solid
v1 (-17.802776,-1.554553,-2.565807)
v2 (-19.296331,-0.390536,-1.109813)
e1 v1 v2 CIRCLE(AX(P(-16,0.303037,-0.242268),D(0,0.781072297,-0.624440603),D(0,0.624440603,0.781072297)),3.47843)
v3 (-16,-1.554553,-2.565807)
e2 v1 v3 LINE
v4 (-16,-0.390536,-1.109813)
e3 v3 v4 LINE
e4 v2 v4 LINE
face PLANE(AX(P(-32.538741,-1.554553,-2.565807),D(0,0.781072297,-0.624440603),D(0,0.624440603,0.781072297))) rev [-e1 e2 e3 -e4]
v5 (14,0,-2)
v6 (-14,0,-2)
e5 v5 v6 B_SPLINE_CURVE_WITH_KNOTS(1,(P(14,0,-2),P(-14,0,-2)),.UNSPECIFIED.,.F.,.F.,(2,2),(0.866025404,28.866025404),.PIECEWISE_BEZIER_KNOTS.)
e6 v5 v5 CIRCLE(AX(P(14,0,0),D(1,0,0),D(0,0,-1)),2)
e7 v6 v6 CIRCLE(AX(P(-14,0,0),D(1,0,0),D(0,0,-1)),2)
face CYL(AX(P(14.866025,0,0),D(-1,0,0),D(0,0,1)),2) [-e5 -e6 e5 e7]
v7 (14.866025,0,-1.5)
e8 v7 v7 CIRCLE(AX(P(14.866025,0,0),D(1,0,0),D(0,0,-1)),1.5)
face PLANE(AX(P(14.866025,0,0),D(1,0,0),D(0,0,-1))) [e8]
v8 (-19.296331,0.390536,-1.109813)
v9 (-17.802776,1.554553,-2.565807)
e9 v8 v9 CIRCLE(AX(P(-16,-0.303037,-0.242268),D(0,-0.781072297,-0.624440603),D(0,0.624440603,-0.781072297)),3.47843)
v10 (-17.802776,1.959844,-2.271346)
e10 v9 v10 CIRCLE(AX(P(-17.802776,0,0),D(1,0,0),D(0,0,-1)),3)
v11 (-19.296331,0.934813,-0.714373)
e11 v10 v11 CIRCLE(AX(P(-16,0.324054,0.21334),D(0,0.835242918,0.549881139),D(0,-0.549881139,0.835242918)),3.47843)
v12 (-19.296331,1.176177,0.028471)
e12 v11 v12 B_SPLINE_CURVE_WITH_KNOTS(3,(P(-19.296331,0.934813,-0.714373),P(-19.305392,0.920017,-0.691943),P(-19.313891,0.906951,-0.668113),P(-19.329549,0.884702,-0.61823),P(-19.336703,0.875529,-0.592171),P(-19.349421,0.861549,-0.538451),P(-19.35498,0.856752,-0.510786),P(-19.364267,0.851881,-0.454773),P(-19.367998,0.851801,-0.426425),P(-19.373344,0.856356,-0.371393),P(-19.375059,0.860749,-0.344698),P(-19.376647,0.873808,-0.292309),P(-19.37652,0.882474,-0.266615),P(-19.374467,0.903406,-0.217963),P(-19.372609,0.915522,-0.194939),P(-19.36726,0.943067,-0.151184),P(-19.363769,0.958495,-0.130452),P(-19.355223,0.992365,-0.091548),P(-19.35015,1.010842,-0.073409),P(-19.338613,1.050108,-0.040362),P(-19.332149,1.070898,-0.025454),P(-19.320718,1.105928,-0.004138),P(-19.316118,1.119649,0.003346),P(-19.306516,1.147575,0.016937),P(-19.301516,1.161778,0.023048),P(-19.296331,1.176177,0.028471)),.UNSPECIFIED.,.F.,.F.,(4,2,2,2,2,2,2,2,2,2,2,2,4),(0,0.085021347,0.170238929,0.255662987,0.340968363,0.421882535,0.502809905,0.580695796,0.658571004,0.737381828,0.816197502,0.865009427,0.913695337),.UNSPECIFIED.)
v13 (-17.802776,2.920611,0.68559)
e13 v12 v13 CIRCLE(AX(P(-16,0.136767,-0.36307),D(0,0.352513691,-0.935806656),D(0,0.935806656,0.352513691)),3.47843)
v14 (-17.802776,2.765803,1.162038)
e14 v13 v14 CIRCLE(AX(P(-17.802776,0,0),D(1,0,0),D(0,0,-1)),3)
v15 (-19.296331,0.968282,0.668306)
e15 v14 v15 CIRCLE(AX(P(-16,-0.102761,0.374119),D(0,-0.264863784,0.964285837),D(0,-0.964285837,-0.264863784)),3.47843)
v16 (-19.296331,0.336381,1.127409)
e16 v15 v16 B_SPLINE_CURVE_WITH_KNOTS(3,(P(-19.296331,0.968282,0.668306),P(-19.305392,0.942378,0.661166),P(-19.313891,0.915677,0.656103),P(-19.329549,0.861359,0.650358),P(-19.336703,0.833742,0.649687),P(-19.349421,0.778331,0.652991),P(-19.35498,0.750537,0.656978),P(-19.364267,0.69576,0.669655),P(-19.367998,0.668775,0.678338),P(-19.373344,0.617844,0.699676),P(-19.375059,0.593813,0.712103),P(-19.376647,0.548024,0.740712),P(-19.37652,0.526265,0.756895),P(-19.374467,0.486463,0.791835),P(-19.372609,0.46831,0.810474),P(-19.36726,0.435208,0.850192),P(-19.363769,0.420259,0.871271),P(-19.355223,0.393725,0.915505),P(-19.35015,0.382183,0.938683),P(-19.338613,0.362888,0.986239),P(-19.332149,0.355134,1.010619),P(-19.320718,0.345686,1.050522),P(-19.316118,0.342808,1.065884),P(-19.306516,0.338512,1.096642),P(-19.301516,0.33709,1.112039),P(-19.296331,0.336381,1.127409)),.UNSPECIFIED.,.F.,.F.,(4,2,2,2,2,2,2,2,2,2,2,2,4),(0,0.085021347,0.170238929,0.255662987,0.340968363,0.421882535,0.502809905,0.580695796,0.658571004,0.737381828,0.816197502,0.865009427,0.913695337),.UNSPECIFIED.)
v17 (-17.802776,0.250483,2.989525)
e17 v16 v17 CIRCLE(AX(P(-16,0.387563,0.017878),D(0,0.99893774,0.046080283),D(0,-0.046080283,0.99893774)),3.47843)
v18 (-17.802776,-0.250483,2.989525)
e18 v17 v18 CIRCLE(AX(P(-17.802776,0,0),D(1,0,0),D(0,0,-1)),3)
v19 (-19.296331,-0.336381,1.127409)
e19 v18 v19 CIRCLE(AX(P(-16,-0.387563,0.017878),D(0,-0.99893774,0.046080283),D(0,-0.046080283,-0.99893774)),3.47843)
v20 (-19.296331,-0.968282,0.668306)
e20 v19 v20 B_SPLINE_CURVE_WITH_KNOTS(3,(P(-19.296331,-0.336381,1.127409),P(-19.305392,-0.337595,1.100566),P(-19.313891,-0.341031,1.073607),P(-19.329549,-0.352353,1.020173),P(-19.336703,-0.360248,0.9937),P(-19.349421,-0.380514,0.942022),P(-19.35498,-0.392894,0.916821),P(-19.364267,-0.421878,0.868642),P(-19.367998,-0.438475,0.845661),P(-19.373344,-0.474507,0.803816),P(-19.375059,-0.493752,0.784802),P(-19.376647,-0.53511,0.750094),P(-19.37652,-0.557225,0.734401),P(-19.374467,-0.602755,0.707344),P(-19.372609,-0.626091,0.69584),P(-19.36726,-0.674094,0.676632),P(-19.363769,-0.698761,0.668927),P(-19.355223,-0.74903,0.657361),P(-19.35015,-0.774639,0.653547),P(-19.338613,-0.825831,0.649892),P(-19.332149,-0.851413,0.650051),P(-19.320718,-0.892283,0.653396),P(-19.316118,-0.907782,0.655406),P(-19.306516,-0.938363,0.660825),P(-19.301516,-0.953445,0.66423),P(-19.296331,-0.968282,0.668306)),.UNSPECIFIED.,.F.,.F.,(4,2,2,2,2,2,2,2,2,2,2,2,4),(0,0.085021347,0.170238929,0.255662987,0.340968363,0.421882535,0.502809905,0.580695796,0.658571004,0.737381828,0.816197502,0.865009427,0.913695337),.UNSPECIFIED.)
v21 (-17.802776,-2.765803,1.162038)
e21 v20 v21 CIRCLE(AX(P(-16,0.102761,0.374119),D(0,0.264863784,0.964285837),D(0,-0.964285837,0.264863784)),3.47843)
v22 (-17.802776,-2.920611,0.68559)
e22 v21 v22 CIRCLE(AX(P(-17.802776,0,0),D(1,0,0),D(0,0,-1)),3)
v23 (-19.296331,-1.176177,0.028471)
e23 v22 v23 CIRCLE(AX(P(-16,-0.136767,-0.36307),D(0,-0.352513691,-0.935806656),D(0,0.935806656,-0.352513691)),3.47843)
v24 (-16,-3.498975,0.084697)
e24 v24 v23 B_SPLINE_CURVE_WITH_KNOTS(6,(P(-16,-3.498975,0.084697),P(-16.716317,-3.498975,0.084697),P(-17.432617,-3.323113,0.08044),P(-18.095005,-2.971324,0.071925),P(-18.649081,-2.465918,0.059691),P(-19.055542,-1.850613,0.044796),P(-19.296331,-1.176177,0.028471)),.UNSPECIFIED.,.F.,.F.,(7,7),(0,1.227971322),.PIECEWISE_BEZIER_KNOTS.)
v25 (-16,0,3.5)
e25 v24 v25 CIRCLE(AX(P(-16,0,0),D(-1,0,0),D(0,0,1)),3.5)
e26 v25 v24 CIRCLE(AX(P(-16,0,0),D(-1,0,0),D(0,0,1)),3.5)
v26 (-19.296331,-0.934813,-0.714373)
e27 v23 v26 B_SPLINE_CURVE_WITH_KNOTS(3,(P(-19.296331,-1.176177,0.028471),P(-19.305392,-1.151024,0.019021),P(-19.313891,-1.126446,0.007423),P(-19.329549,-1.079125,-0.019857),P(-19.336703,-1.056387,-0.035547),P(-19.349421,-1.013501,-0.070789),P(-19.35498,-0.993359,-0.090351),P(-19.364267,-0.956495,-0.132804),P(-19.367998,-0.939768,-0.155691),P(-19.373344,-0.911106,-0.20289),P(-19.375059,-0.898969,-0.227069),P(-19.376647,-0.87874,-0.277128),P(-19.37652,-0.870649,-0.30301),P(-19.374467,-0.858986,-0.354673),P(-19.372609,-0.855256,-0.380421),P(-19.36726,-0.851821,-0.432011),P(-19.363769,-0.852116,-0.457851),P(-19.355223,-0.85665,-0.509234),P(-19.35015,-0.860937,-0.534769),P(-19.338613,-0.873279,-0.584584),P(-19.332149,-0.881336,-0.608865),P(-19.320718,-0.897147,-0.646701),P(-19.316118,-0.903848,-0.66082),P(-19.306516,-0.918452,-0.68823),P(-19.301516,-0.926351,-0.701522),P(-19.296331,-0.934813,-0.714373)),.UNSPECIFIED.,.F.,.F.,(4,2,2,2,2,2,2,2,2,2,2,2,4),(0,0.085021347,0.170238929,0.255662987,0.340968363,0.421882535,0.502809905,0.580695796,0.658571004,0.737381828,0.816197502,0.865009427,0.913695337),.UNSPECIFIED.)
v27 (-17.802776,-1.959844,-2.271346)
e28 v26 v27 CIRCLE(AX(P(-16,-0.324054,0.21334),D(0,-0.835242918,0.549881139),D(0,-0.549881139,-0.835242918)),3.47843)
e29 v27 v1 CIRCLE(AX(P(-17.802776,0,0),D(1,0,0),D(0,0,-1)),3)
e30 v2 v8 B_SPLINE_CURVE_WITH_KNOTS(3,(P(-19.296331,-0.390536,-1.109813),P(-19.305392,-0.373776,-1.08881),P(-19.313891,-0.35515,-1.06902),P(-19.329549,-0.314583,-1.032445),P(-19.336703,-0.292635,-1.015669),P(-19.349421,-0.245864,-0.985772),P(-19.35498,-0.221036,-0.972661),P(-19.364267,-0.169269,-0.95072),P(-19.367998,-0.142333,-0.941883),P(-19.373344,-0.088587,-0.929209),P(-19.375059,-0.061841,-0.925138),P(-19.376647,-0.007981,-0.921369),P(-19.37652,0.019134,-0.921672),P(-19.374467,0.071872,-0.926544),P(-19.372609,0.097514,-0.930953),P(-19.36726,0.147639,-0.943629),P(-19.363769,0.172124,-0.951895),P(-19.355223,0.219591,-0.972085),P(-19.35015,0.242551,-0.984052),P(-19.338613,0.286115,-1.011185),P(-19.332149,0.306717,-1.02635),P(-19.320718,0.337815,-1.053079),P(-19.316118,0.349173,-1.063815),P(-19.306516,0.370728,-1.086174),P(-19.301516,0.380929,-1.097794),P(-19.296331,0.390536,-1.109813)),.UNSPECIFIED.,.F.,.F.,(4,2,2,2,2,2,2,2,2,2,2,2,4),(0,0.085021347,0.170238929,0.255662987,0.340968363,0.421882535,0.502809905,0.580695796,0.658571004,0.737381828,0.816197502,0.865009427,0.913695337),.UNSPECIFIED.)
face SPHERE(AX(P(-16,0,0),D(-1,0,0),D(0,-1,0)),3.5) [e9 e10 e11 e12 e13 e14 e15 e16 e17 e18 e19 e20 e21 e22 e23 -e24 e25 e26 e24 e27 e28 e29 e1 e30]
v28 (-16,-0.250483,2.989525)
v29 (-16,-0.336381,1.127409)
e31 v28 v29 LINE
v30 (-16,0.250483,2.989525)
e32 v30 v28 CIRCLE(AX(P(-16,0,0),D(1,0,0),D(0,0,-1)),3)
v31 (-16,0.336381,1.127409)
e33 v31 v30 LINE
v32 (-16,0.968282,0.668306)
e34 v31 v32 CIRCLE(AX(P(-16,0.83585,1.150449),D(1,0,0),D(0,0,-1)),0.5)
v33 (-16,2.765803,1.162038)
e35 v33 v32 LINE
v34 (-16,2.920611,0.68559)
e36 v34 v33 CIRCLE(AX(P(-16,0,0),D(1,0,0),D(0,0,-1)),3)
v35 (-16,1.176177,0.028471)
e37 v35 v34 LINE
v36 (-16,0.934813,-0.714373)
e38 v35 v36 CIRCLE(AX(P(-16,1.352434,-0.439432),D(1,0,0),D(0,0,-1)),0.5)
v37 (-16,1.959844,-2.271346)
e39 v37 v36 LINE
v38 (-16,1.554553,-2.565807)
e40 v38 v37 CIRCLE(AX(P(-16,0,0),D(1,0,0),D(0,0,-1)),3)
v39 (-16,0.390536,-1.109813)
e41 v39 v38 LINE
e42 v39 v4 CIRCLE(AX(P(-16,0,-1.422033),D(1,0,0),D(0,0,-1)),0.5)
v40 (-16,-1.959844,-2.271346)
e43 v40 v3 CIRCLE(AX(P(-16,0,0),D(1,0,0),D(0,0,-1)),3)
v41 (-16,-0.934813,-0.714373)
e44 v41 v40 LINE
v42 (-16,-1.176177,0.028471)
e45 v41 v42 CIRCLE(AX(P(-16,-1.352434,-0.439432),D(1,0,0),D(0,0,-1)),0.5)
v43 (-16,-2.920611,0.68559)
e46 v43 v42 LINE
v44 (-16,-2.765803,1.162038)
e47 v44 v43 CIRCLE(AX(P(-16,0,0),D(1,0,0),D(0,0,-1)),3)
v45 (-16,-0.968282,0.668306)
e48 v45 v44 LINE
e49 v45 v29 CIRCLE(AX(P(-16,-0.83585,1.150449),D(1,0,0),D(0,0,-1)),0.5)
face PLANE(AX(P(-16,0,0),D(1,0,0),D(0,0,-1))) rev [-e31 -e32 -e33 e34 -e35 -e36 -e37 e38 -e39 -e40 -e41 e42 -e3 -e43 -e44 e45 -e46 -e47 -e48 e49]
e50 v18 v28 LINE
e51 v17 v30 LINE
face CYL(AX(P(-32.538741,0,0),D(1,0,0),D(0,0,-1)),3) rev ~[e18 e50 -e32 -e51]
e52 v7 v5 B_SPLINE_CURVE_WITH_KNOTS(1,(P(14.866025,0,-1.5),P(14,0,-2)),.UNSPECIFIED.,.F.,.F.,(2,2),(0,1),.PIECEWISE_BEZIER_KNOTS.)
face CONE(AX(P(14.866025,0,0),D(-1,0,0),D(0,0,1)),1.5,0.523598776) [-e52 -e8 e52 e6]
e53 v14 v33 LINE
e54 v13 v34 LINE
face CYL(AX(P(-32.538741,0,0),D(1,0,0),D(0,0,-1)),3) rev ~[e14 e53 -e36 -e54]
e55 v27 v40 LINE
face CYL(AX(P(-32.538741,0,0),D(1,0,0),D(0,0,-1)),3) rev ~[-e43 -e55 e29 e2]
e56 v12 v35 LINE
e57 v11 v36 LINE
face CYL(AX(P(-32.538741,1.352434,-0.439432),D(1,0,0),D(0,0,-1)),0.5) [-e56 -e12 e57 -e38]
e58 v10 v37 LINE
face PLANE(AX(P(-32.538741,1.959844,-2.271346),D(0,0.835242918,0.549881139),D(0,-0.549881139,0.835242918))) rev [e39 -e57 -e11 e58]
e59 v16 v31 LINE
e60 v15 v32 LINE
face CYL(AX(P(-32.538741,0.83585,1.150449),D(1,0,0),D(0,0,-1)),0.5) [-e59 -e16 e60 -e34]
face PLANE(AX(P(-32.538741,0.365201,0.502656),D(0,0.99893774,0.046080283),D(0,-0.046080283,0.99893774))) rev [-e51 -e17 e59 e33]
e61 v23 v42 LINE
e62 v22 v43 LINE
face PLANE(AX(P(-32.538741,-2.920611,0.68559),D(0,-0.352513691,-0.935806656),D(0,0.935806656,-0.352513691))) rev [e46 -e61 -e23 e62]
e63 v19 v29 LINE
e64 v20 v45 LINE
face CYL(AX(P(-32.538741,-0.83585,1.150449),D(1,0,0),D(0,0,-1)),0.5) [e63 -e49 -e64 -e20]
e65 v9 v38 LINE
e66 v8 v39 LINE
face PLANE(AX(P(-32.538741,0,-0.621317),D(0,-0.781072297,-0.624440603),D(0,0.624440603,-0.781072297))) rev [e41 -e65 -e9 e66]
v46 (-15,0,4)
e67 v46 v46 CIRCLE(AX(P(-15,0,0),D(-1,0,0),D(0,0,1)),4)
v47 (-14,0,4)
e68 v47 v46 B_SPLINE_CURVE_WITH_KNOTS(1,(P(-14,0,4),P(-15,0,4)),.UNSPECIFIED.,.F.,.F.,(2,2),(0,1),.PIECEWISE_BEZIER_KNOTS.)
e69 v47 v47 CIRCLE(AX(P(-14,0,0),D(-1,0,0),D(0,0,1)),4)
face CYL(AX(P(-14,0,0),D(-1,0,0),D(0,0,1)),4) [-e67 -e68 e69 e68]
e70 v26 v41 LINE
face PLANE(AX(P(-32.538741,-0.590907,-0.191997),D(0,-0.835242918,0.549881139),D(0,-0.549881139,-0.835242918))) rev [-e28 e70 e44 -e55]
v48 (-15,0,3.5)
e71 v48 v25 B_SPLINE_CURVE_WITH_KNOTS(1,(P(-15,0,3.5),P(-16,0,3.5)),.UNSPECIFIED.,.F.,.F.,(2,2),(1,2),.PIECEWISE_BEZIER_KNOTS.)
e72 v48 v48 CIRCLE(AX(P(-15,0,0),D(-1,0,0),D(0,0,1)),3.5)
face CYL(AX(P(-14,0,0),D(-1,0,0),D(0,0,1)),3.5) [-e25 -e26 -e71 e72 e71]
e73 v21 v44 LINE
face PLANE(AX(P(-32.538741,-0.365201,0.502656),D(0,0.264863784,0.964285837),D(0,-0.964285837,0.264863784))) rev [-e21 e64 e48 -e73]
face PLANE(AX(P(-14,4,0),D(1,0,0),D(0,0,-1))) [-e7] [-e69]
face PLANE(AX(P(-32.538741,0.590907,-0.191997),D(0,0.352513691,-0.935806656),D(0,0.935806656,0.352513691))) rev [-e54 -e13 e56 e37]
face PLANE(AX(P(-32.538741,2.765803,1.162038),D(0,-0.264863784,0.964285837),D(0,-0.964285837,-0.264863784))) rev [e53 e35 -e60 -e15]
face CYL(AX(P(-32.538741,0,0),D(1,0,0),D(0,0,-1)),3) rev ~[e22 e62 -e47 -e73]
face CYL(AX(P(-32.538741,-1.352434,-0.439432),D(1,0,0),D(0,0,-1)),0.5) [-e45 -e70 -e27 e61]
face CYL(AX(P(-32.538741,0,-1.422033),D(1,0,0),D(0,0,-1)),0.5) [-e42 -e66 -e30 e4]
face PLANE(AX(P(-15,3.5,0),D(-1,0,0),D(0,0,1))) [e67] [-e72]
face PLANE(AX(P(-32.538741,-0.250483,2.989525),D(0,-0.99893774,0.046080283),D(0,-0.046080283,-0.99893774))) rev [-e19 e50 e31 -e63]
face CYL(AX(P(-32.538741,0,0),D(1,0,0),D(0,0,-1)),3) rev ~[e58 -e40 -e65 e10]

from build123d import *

# Parameters (mm, degrees)
SKETCH2_R               = 2
BOSS_EXTRUDE1_DEPTH     = 28.866025404
CUT_EXTRUDE1_REACH      = 33.38
CUT_EXTRUDE1_END_RADIUS = 3.5
CHAMFER1_SIZE           = 0.5
CHAMFER1_SIZE2          = 0.866025404
FILLET1_R               = 0.5


with BuildPart() as part:
    # Sketch1 → Revolve1 (revolve)
    with BuildSketch(Plane(origin=(0, 0, 0), x_dir=(-1, 0, 0), z_dir=(0, 0, -1)), mode=Mode.PRIVATE) as revolve1_sk:
        with BuildLine():
            Line((14, 4), (14, 0))
            Line((14, 0), (19.5, 0))
            ThreePointArc((19.5, 0), (18.474873734, 2.474873734), (16, 3.5))
            Line((16, 3.5), (15, 3.5))
            Line((15, 3.5), (15, 4))
            Line((15, 4), (14, 4))
        make_face()
    revolve(revolve1_sk.sketch.rotate(Axis((-14, 0, 0), (-1, 0, 0)), 270), axis=Axis((-14, 0, 0), (-1, 0, 0)))

    # Sketch2 → Boss-Extrude1 (add)
    with BuildSketch(Plane(origin=(-14, 0, 0), x_dir=(0, 0, -1), z_dir=(1, 0, 0))):
        Circle(SKETCH2_R)
    extrude(amount=BOSS_EXTRUDE1_DEPTH)

    # Cut-Extrude1: up to this sphere (the profile starts inside it)
    cut_extrude1_end = Location((-16, 0, 0)) * Sphere(CUT_EXTRUDE1_END_RADIUS, mode=Mode.PRIVATE)
    # Sketch3 → Cut-Extrude1 (cut, up to the surface)
    with BuildSketch(Plane(origin=(-16, 0, 0), x_dir=(0, 0, -1), z_dir=(1, 0, 0)), mode=Mode.PRIVATE) as cut_extrude1_sk1:
        with BuildLine():
            Line((2.271345978, 1.959843731), (0.191997374, 0.590907157))
            Line((0.191997374, 0.590907157), (-0.685590254, 2.920610553))
            ThreePointArc((-0.685590254, 2.920610553), (-0.927050983, 2.853169549), (-1.162037644, 2.765803412))
            Line((-1.162037644, 2.765803412), (-0.502655651, 0.365200707))
            Line((-0.502655651, 0.365200707), (-2.989524738, 0.250483216))
            ThreePointArc((-2.989524738, 0.250483216), (-3, 0), (-2.989524738, -0.250483216))
            Line((-2.989524738, -0.250483216), (-0.502655651, -0.365200707))
            Line((-0.502655651, -0.365200707), (-1.162037644, -2.765803412))
            ThreePointArc((-1.162037644, -2.765803412), (-0.927050983, -2.853169549), (-0.685590254, -2.920610553))
            Line((-0.685590254, -2.920610553), (0.191997374, -0.590907157))
            Line((0.191997374, -0.590907157), (2.271345978, -1.959843731))
            ThreePointArc((2.271345978, -1.959843731), (2.427050983, -1.763355757), (2.565806659, -1.554553373))
            Line((2.565806659, -1.554553373), (0.621316554, 0))
            Line((0.621316554, 0), (2.565806659, 1.554553373))
            ThreePointArc((2.565806659, 1.554553373), (2.427050983, 1.763355757), (2.271345978, 1.959843731))
        make_face()
    cut_extrude1_tool1 = extrude(cut_extrude1_sk1.sketch, amount=-CUT_EXTRUDE1_REACH, mode=Mode.PRIVATE) & cut_extrude1_end
    add(cut_extrude1_tool1.solids().sort_by_distance((-16, 0, 0))[0], mode=Mode.SUBTRACT)

    # Chamfer1
    chamfer1_edges = [part.edges().sort_by_distance(p)[0] for p in [
        (14.866025404, 0, 2),
    ]]
    chamfer1_side = [part.faces().sort_by_distance(p)[0] for p in [
        (14.866025404, 0, 0),
    ]]
    chamfer(chamfer1_edges, length=CHAMFER1_SIZE, length2=CHAMFER1_SIZE2, reference=chamfer1_side[0])

    # Fillet1
    # the kernel refuses this fillet: 0.5 mm, written as the material it takes off along each edge
    with BuildSketch(Plane(origin=(-16, 0, -0.621316554), x_dir=(0, -0.6244406033134772, -0.7810722968672622), z_dir=(-1, 0, 0)), Plane(origin=(-16, -0.590907157, -0.191997374), x_dir=(0, -0.9358066560348443, 0.35251369125309573), z_dir=(-1, 0, 0)), Plane(origin=(-16, -0.365200707, 0.502655651), x_dir=(0, 0.04608028298555685, 0.9989377395613659), z_dir=(-1, 0, 0)), Plane(origin=(-16, 0.365200707, 0.502655651), x_dir=(0, 0.964285837131132, 0.2648637844408172), z_dir=(-1, 0, 0)), Plane(origin=(-16, 0.590907157, -0.191997374), x_dir=(0, 0.5498811392316572, -0.8352429183879951), z_dir=(-1, 0, 0))) as fillet1_piece_1:
        with BuildLine():
            CenterArc((FILLET1_R * 1.25083521591, -FILLET1_R), FILLET1_R, 90, 102.717718013)
            Line((FILLET1_R * 0.275368703333, -FILLET1_R * 1.22014786587), (0, 0))
            Line((0, 0), (FILLET1_R * 1.25083521591, 0))
        make_face()
    extrude(amount=5.007954817, mode=Mode.SUBTRACT)


solid = part.part
